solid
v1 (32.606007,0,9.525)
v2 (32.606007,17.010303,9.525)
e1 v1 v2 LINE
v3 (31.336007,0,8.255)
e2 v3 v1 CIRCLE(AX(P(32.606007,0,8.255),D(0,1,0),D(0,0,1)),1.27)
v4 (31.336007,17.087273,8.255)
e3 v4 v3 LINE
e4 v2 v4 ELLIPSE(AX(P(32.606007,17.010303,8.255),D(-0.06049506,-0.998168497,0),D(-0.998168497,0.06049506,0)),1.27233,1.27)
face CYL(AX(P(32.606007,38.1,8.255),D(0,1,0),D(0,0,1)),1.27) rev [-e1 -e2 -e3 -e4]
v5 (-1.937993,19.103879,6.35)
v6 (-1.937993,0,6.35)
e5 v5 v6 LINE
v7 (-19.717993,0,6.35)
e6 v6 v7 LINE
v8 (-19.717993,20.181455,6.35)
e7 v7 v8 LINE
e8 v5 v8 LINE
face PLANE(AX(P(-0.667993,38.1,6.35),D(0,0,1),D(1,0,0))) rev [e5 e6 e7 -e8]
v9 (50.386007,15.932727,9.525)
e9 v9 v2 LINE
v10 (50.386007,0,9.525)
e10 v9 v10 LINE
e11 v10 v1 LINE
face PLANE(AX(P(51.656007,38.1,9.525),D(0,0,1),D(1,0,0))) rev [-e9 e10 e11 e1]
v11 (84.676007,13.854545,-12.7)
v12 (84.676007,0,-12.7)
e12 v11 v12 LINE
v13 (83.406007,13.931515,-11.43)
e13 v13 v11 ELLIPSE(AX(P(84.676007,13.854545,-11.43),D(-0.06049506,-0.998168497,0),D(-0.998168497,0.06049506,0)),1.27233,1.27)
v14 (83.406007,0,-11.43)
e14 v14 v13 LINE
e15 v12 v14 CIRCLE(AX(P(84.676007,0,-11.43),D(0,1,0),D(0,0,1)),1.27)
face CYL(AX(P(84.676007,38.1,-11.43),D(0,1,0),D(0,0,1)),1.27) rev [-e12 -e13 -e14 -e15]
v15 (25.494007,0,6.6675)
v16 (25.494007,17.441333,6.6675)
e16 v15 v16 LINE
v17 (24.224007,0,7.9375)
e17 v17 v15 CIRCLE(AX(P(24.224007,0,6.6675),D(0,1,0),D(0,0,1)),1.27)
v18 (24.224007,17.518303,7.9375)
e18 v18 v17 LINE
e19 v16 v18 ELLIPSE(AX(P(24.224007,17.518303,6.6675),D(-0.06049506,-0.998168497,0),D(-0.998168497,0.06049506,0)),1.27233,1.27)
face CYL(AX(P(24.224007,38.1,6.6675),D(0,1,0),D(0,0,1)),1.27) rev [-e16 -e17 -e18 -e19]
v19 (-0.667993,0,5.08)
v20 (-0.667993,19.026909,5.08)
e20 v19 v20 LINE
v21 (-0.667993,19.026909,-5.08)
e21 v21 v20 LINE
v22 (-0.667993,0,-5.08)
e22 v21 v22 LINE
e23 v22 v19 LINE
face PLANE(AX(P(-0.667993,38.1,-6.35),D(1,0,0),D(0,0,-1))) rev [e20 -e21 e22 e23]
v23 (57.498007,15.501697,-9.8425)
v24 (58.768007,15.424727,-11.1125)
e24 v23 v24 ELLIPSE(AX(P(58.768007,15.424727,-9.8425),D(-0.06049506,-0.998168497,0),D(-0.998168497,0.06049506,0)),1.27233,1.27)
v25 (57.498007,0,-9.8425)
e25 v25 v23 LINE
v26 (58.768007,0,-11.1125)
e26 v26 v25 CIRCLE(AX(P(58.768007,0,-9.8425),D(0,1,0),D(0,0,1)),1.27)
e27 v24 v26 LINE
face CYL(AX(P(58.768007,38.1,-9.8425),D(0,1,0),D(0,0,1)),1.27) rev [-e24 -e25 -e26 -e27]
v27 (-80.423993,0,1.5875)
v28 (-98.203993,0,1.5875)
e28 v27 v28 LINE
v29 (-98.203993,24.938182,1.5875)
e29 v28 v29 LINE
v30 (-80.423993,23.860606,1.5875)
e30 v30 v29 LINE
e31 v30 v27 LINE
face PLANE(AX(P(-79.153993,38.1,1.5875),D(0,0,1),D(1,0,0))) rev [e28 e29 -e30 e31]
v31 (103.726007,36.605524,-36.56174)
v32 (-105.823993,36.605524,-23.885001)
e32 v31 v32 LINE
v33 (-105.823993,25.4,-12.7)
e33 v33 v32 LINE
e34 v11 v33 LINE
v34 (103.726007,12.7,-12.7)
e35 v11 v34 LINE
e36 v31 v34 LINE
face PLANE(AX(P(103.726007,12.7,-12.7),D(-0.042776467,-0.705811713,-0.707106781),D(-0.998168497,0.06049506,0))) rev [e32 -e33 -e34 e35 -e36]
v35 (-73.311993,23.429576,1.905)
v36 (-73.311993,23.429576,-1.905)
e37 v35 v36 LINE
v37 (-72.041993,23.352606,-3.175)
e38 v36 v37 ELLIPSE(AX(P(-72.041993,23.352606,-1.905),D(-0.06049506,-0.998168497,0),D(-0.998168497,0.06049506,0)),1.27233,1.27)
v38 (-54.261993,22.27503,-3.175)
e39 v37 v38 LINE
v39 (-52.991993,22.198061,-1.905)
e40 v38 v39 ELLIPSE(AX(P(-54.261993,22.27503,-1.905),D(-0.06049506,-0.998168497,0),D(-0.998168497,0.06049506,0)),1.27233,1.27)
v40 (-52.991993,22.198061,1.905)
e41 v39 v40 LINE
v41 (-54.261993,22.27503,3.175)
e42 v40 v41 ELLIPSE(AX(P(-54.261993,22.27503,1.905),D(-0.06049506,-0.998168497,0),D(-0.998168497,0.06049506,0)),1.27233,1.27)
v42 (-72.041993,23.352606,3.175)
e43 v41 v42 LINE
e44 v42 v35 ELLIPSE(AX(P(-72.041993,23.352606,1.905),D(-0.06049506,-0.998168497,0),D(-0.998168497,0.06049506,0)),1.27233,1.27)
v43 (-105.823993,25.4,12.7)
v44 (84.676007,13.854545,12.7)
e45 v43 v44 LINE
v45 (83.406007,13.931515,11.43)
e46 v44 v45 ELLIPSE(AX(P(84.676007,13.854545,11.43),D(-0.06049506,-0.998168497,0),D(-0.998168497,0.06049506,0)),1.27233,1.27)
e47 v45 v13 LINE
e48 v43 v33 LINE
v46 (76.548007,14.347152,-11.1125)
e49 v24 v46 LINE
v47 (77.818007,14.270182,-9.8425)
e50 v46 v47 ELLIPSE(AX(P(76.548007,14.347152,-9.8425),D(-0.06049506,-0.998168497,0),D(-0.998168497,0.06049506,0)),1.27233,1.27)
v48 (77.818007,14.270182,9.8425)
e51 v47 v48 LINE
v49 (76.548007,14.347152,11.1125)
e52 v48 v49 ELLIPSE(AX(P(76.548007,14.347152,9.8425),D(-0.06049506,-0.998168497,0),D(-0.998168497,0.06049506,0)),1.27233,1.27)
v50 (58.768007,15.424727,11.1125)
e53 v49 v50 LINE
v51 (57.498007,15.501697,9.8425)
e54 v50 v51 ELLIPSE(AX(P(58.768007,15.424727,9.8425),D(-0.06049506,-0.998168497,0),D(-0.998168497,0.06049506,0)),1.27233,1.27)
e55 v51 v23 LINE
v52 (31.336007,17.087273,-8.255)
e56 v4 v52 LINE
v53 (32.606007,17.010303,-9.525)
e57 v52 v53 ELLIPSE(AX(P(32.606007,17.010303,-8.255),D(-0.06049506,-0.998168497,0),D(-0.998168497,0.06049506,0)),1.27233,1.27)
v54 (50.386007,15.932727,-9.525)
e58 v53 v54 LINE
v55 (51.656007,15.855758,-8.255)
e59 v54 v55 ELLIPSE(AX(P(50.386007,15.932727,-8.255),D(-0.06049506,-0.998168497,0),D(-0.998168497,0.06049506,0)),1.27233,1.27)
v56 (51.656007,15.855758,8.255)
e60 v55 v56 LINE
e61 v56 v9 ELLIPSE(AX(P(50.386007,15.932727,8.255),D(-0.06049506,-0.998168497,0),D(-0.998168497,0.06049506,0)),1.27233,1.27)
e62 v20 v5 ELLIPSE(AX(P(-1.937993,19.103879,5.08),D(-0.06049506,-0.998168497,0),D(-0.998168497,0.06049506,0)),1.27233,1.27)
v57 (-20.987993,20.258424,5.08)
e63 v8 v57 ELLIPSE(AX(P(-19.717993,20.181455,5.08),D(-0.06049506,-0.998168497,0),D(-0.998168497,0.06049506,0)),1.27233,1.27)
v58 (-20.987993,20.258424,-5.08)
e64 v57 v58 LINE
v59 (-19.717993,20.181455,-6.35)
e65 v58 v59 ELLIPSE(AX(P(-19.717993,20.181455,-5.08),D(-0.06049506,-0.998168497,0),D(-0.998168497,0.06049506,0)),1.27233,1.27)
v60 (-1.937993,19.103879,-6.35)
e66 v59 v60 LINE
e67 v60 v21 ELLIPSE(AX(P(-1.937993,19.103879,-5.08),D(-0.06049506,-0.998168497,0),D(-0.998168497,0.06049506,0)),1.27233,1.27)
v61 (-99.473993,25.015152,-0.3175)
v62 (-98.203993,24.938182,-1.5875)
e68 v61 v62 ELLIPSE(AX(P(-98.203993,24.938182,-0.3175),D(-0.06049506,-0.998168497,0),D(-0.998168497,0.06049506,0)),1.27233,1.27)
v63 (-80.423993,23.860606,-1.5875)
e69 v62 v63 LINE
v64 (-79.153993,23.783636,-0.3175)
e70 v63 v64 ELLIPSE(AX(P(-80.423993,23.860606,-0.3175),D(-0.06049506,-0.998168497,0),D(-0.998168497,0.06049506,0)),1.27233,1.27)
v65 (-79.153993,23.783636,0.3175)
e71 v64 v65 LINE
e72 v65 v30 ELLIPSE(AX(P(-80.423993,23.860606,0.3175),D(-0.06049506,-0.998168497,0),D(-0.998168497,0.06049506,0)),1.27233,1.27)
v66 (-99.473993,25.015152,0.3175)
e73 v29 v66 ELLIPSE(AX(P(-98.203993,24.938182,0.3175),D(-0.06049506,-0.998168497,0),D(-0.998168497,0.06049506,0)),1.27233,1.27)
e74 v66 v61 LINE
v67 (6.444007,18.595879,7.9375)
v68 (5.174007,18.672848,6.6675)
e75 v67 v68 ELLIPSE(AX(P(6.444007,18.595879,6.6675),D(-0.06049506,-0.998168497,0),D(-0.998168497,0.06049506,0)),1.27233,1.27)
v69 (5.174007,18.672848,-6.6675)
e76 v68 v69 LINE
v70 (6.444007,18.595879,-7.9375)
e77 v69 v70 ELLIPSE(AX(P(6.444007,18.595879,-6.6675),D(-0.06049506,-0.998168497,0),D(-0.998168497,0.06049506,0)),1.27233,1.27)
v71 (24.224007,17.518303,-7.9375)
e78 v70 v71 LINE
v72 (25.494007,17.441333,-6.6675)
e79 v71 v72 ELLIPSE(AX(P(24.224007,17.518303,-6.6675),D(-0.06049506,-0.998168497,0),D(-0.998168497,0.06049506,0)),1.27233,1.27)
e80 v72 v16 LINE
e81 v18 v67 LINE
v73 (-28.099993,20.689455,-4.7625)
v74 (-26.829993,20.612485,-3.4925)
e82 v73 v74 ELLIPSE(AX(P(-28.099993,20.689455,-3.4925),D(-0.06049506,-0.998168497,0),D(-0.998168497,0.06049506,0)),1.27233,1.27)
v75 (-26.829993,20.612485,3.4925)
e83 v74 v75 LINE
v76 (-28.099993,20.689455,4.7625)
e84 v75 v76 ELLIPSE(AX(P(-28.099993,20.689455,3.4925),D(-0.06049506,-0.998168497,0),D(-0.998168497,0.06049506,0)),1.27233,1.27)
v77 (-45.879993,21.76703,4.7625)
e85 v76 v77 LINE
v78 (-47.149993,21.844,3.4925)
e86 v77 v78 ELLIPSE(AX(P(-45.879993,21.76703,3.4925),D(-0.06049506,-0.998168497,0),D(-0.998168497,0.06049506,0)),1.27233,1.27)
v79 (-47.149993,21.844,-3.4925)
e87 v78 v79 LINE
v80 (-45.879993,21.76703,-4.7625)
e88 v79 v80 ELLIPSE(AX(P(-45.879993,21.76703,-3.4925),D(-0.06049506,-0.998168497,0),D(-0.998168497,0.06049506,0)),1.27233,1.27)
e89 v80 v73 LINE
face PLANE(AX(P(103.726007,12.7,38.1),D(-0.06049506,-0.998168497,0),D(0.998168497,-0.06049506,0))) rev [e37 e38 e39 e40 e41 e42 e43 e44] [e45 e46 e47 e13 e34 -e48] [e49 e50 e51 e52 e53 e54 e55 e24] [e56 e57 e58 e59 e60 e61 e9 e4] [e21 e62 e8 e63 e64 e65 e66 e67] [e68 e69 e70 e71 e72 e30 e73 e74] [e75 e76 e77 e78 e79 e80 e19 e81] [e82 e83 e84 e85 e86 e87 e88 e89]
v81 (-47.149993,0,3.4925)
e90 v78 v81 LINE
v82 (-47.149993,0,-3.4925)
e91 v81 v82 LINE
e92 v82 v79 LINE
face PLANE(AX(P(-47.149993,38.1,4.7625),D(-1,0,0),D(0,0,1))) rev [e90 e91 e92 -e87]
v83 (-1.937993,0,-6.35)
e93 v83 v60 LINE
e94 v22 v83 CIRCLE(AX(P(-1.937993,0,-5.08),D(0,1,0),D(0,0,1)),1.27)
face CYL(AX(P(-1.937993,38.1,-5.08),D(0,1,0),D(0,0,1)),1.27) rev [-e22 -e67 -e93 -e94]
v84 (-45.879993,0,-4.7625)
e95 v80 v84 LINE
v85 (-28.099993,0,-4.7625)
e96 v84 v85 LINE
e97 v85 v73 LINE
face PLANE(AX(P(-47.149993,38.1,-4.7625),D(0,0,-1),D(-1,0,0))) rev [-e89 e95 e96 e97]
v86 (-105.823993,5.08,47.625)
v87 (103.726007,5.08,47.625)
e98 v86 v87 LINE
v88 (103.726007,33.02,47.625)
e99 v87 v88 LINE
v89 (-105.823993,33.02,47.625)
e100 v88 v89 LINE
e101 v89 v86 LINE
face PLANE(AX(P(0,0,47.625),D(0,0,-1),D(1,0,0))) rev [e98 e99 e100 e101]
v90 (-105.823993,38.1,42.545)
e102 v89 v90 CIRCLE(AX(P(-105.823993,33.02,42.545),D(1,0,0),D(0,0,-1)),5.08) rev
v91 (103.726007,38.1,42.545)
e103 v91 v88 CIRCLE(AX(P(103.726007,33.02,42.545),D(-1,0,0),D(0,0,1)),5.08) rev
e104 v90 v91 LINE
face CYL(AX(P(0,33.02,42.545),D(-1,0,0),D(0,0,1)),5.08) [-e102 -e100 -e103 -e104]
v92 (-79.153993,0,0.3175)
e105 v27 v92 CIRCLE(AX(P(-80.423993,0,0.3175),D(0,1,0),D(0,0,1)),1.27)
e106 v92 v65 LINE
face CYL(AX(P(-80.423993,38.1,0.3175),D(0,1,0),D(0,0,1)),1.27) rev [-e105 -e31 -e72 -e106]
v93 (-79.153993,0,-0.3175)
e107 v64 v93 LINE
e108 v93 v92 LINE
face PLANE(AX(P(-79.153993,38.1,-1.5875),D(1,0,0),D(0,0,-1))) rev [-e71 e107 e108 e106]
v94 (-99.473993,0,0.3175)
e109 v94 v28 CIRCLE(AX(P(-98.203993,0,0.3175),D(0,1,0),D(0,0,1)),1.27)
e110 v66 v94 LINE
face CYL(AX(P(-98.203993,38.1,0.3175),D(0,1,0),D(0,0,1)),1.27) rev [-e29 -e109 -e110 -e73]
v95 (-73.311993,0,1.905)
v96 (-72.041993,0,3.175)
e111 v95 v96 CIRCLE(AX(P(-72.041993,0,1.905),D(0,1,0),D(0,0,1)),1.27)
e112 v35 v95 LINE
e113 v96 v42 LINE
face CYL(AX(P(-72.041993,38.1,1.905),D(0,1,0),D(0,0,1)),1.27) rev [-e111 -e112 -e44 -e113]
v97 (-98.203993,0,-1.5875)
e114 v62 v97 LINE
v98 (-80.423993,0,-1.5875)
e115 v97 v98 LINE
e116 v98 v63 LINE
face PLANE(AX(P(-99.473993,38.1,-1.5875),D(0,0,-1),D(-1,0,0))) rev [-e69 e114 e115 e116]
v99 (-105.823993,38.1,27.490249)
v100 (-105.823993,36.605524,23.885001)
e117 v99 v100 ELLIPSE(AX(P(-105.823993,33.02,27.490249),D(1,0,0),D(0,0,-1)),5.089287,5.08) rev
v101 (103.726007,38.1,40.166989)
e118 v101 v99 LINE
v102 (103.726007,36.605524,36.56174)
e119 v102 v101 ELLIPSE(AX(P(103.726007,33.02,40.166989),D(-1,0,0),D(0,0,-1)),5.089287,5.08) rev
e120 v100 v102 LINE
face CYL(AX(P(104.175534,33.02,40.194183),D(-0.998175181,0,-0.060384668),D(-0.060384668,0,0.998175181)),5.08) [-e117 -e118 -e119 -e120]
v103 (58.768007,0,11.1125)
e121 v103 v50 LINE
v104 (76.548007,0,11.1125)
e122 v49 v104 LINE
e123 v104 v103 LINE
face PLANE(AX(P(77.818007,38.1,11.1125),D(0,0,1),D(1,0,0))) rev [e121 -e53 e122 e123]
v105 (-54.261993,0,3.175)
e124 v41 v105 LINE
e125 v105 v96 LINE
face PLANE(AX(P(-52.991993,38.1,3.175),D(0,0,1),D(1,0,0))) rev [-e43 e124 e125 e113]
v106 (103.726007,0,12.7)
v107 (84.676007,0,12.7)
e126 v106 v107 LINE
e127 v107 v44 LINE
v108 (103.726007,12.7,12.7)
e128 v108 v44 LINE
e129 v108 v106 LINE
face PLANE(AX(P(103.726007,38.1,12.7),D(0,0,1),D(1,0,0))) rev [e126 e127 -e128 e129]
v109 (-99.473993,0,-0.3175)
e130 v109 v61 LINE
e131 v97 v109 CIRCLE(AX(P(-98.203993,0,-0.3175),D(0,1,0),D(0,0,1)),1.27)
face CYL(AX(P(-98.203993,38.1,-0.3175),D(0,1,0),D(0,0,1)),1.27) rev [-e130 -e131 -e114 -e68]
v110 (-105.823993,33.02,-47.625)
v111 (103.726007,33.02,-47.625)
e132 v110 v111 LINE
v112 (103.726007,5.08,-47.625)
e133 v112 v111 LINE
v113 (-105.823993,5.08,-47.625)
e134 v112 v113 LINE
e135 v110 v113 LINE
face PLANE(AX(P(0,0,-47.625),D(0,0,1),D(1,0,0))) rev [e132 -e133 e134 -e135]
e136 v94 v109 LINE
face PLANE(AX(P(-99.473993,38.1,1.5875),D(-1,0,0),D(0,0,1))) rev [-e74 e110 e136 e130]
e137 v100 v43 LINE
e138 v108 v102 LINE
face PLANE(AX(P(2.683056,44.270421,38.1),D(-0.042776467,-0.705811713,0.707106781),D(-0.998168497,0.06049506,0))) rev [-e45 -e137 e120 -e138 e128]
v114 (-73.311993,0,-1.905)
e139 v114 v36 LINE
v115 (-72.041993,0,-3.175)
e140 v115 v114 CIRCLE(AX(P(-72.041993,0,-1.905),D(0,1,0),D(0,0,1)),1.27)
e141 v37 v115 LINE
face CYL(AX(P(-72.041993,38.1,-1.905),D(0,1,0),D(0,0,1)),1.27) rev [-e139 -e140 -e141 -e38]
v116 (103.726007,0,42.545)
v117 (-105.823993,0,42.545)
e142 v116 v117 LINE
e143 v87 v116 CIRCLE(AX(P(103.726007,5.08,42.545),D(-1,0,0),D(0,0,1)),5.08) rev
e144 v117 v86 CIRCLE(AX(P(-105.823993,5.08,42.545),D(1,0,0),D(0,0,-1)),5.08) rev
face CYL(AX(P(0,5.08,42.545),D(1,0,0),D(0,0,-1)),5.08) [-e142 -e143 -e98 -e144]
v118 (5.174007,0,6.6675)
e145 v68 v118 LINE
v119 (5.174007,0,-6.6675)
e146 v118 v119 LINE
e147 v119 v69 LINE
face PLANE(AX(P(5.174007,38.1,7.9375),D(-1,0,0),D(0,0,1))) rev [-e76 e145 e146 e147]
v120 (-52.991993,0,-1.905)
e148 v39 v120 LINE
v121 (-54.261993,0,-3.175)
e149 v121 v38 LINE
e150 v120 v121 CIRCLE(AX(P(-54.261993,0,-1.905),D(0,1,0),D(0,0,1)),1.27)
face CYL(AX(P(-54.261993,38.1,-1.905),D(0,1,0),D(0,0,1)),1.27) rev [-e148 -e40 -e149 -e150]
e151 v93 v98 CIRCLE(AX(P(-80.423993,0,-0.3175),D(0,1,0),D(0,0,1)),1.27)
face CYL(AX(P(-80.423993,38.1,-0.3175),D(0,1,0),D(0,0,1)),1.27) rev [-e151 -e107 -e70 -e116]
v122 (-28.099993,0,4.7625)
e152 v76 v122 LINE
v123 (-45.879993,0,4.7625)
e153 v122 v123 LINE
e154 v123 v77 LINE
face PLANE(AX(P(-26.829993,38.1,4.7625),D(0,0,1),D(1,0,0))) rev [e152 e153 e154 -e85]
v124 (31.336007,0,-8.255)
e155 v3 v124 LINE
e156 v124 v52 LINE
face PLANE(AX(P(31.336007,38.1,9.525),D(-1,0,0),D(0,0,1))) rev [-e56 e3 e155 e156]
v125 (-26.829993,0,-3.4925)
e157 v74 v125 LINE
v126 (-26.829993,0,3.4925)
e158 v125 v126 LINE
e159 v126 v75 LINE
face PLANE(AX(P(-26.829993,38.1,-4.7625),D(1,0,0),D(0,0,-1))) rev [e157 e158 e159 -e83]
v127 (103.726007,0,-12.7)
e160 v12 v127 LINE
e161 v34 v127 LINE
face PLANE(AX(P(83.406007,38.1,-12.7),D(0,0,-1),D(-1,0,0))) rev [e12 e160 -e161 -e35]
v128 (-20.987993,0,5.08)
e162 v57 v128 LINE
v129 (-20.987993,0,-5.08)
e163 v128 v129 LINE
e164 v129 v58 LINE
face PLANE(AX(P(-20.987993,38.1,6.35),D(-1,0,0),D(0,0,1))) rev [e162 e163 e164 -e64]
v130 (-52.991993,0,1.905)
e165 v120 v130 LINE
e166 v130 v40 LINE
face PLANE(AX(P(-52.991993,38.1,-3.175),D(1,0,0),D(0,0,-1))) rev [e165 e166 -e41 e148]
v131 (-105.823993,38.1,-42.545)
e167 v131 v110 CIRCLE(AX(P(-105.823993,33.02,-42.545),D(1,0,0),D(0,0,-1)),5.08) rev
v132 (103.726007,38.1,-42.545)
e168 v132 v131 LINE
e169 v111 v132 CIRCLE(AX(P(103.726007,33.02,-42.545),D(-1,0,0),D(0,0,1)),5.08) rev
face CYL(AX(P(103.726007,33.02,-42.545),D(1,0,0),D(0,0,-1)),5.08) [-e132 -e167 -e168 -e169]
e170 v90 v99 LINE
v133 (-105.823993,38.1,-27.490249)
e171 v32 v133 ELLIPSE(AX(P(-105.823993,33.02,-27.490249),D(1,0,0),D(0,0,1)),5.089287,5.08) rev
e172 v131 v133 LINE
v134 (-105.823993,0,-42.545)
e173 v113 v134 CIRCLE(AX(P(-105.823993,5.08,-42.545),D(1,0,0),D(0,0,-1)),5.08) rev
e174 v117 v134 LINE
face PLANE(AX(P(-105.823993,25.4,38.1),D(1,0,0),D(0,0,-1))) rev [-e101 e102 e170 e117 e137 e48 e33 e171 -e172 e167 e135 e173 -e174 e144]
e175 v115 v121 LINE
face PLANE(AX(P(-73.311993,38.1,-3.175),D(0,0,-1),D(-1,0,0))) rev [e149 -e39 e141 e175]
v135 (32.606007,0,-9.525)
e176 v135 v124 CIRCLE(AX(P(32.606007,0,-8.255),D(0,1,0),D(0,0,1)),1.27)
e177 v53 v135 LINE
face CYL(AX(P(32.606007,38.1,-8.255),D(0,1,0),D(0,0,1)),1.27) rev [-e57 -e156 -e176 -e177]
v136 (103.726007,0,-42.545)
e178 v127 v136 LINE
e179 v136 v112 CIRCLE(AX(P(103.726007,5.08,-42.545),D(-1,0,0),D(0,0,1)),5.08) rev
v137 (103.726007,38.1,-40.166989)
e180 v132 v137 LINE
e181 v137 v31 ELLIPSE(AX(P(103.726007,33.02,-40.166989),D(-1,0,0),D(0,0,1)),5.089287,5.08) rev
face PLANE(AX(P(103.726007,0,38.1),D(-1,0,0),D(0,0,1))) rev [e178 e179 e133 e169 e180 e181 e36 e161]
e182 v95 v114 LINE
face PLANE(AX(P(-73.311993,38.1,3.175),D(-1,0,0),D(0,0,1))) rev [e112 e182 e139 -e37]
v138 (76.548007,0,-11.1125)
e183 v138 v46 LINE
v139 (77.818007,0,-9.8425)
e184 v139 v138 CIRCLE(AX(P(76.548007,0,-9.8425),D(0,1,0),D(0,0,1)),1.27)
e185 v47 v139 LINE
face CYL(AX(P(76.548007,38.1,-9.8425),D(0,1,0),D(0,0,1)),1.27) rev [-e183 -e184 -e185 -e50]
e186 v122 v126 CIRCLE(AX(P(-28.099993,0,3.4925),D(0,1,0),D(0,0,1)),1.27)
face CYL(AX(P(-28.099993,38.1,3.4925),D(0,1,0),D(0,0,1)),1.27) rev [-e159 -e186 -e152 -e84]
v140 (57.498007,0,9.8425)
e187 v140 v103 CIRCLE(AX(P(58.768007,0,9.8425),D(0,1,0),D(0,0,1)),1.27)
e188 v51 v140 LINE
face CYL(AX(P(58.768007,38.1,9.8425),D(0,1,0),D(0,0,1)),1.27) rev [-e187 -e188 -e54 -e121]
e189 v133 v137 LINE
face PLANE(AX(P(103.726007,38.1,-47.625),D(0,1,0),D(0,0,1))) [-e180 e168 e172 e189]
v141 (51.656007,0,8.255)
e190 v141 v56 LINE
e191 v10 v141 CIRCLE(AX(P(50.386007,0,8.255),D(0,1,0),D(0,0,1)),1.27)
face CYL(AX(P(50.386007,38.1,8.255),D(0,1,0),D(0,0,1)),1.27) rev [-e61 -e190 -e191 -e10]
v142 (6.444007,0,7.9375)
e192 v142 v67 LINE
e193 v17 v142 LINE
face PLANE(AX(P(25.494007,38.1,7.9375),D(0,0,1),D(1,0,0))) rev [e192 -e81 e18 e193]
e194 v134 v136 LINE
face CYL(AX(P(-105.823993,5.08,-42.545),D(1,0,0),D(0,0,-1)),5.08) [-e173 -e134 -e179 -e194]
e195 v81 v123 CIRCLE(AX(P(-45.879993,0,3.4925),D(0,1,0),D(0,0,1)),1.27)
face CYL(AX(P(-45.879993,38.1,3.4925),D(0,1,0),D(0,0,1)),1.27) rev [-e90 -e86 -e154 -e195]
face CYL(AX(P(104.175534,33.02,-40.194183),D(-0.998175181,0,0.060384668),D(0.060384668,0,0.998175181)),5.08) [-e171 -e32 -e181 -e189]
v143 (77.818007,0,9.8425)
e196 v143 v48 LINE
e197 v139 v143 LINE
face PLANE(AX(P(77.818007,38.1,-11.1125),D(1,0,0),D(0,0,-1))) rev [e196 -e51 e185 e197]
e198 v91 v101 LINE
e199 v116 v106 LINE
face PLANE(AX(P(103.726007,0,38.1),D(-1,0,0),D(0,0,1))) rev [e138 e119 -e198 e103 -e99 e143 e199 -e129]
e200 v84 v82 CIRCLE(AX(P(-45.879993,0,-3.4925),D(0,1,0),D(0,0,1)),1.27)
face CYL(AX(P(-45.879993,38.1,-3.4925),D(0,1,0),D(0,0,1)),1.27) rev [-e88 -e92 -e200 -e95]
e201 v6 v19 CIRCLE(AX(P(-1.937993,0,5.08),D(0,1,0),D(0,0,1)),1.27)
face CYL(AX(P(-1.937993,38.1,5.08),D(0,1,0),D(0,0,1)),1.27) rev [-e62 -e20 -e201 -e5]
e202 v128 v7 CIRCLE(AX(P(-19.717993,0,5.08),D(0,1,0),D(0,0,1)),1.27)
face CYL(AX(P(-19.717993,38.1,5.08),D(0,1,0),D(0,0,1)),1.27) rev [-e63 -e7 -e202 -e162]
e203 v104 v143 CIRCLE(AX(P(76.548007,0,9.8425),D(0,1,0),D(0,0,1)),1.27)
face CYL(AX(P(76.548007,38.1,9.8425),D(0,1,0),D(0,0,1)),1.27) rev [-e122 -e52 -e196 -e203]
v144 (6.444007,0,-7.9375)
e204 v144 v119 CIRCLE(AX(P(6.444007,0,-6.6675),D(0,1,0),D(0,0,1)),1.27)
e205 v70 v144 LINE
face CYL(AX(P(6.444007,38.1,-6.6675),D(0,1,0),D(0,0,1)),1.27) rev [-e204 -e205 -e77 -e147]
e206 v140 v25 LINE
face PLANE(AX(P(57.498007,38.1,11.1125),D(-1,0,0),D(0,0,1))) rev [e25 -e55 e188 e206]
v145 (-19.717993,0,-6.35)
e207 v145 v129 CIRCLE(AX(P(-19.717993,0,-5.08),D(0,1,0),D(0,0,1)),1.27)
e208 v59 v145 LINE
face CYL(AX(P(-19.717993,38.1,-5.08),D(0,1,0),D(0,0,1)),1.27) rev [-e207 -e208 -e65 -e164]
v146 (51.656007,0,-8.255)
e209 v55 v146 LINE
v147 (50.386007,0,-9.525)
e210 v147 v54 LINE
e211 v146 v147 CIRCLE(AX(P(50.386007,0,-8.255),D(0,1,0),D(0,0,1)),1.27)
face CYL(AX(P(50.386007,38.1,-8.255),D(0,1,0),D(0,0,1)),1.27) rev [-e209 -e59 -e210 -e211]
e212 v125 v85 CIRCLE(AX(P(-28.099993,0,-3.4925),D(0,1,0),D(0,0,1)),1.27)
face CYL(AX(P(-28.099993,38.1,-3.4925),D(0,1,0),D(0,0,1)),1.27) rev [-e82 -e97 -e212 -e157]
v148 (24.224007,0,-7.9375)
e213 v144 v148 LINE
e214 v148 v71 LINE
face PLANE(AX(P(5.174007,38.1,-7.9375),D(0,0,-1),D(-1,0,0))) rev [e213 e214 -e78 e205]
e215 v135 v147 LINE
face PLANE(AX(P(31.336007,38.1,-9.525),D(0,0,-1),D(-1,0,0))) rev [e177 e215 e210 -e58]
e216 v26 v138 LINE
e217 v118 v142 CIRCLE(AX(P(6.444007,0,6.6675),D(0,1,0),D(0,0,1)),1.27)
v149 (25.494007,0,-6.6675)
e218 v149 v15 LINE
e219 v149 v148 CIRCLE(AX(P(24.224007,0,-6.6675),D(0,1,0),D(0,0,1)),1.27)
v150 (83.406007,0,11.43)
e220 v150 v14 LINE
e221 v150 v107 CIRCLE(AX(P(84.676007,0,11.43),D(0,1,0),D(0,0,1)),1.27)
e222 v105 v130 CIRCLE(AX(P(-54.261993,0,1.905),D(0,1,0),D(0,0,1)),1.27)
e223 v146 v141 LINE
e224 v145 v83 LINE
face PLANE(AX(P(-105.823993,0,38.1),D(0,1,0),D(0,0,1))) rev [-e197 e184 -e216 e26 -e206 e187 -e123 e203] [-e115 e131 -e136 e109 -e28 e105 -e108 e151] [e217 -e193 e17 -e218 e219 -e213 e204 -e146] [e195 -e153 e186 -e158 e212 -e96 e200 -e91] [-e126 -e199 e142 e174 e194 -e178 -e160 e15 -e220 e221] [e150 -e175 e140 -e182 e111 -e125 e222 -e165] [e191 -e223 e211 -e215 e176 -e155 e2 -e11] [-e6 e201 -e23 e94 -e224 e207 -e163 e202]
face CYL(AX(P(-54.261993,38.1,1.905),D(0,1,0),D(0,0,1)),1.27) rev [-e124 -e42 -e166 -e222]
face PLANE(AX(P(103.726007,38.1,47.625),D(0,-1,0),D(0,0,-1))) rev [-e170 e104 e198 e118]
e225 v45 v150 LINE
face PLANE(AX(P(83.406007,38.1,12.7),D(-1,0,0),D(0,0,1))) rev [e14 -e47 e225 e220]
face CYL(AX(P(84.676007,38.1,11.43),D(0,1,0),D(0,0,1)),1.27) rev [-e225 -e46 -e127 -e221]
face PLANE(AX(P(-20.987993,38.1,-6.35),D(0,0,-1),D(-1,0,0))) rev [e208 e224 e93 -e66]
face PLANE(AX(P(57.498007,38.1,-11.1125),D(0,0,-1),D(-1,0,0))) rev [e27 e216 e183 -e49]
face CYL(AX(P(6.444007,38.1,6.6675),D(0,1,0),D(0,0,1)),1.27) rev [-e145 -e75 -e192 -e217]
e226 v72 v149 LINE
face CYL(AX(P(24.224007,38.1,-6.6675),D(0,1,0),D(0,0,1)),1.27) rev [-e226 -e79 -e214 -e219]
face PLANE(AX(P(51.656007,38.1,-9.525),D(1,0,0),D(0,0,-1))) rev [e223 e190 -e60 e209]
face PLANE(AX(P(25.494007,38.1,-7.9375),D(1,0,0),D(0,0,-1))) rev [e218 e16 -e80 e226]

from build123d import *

# Parameters (mm, degrees)
BOSS_EXTRUDE1_DEPTH = 38.1
SKETCH2_W           = 209.55
SKETCH2_H           = 38.1
BOSS_EXTRUDE2_DEPTH = 9.525
SKETCH3_W           = 20.32
SKETCH3_H           = 3.175
SKETCH3_H_2         = 6.35
SKETCH3_H_3         = 9.525
SKETCH3_H_4         = 12.7
SKETCH3_H_5         = 15.875
SKETCH3_H_6         = 19.05
SKETCH3_H_7         = 22.225
SKETCH3_H_8         = 25.4
CUT_EXTRUDE1_DEPTH  = 123.141181515
CHAMFER1_SIZE       = 25.4
CHAMFER2_SIZE       = 25.4
FILLET1_R           = 1.27
FILLET2_R           = 5.08


with BuildPart() as part:
    # Sketch1 → Boss-Extrude1 (new, symmetric)
    with BuildSketch(Plane.XY):
        Polygon((-105.823993484, 0), (103.726006516, 0), (103.726006516, 12.7), (-105.823993484, 25.4), align=None)
    extrude(amount=BOSS_EXTRUDE1_DEPTH, both=True)

    # Sketch2 → Boss-Extrude2 (add)
    with BuildSketch(Plane(origin=(0, 0, -38.1), x_dir=(-1, 0, 0), z_dir=(0, 0, -1))):
        with Locations((1.048993484, 19.05)):
            Rectangle(SKETCH2_W, SKETCH2_H)
    boss_extrude2 = extrude(amount=BOSS_EXTRUDE2_DEPTH)

    # Mirror1: Boss-Extrude2 across plane
    add(boss_extrude2.mirror(Plane.XY))

    # Sketch3 → Cut-Extrude1 (cut, through all)
    with BuildSketch(Plane.XZ):
        with Locations((-89.313993484, 0)):
            Rectangle(SKETCH3_W, SKETCH3_H)
        with Locations((-63.151993484, 0)):
            Rectangle(SKETCH3_W, SKETCH3_H_2)
        with Locations((-36.989993484, 0)):
            Rectangle(SKETCH3_W, SKETCH3_H_3)
        with Locations((-10.827993484, 0)):
            Rectangle(SKETCH3_W, SKETCH3_H_4)
        with Locations((15.334006516, 0)):
            Rectangle(SKETCH3_W, SKETCH3_H_5)
        with Locations((41.496006516, 0)):
            Rectangle(SKETCH3_W, SKETCH3_H_6)
        with Locations((67.658006516, 0)):
            Rectangle(SKETCH3_W, SKETCH3_H_7)
        with Locations((93.566006516, 0)):
            Rectangle(SKETCH3_W, SKETCH3_H_8)
    extrude(amount=-CUT_EXTRUDE1_DEPTH, mode=Mode.SUBTRACT)

    # Chamfer1
    # the kernel refuses this chamfer: 25.4 mm, written as the material it adds along each edge
    with BuildSketch(Plane(origin=(168.92711924, 8.748417411, 38.1), x_dir=(0.060472188242602316, 0.9977911060029382, 0.02749587661058647), z_dir=(-0.9981684966311909, 0.06049506040189036, 0))) as chamfer1_piece_1_section:
        Polygon((CHAMFER1_SIZE * 0.999621916911, CHAMFER1_SIZE * 0.0274958766106), (-CHAMFER1_SIZE * 0.0274958766106, CHAMFER1_SIZE * 0.999621916911), (0, 0), align=None)
    chamfer1_piece_1 = extrude(amount=340.575991525, mode=Mode.PRIVATE)
    chamfer1_piece_1 = split(chamfer1_piece_1, bisect_by=Plane(origin=(103.726006516, 21.644739683, 29.711789503), z_dir=(-1, 0, 0)), keep=Keep.TOP, mode=Mode.PRIVATE)
    chamfer1_piece_1 = split(chamfer1_piece_1, bisect_by=Plane(origin=(93.576497018, 21.644739683, 12.7), z_dir=(0, 0, 1)), keep=Keep.TOP, mode=Mode.PRIVATE)
    chamfer1_piece_1 = split(chamfer1_piece_1, bisect_by=Plane(origin=(83.406006516, 21.644739683, 29.711789503), z_dir=(1, 0, 0)), keep=Keep.TOP, mode=Mode.PRIVATE)
    chamfer1_piece_1 = split(chamfer1_piece_1, bisect_by=Plane(origin=(93.576497018, 38.1, 29.711789503), z_dir=(0, -1, 0)), keep=Keep.TOP, mode=Mode.PRIVATE)
    add(chamfer1_piece_1)
    with BuildSketch(Plane(origin=(168.92711924, 8.748417411, 38.1), x_dir=(0.060472188242602316, 0.9977911060029382, 0.02749587661058647), z_dir=(-0.9981684966311909, 0.06049506040189036, 0))) as chamfer1_piece_2_section:
        Polygon((CHAMFER1_SIZE * 0.999621916911, CHAMFER1_SIZE * 0.0274958766106), (-CHAMFER1_SIZE * 0.0274958766106, CHAMFER1_SIZE * 0.999621916911), (0, 0), align=None)
    chamfer1_piece_2 = extrude(amount=340.575991525, mode=Mode.PRIVATE)
    chamfer1_piece_2 = split(chamfer1_piece_2, bisect_by=Plane(origin=(-105.823993484, 26.508792165, 29.076634432), z_dir=(1, 0, 0)), keep=Keep.TOP, mode=Mode.PRIVATE)
    chamfer1_piece_2 = split(chamfer1_piece_2, bisect_by=Plane(origin=(-6.816832876, 26.508792165, 12.7), z_dir=(0, 0, 1)), keep=Keep.TOP, mode=Mode.PRIVATE)
    chamfer1_piece_2 = split(chamfer1_piece_2, bisect_by=Plane(origin=(83.406006516, 26.508792165, 29.076634432), z_dir=(-1, 0, 0)), keep=Keep.TOP, mode=Mode.PRIVATE)
    chamfer1_piece_2 = split(chamfer1_piece_2, bisect_by=Plane(origin=(-6.816832876, 38.1, 29.076634432), z_dir=(0, -1, 0)), keep=Keep.TOP, mode=Mode.PRIVATE)
    add(chamfer1_piece_2)

    # Chamfer2
    # the kernel refuses this chamfer: 25.4 mm, written as the material it adds along each edge
    with BuildSketch(Plane(origin=(168.92711924, 8.748417411, -38.1), x_dir=(0.060472188242602316, 0.9977911060029382, -0.02749587661058647), z_dir=(-0.9981684966311909, 0.06049506040189036, 0))) as chamfer2_piece_1_section:
        Polygon((CHAMFER2_SIZE * 0.999621916911, -CHAMFER2_SIZE * 0.0274958766106), (-CHAMFER2_SIZE * 0.0274958766106, -CHAMFER2_SIZE * 0.999621916911), (0, 0), align=None)
    chamfer2_piece_1 = extrude(amount=340.575991525, mode=Mode.PRIVATE)
    chamfer2_piece_1 = split(chamfer2_piece_1, bisect_by=Plane(origin=(93.576497018, 38.1, -29.711789503), z_dir=(0, -1, 0)), keep=Keep.TOP, mode=Mode.PRIVATE)
    chamfer2_piece_1 = split(chamfer2_piece_1, bisect_by=Plane(origin=(103.726006516, 21.644739683, -29.711789503), z_dir=(-1, 0, 0)), keep=Keep.TOP, mode=Mode.PRIVATE)
    chamfer2_piece_1 = split(chamfer2_piece_1, bisect_by=Plane(origin=(93.576497018, 21.644739683, -12.7), z_dir=(0, 0, -1)), keep=Keep.TOP, mode=Mode.PRIVATE)
    chamfer2_piece_1 = split(chamfer2_piece_1, bisect_by=Plane(origin=(83.406006516, 21.644739683, -29.711789503), z_dir=(1, 0, 0)), keep=Keep.TOP, mode=Mode.PRIVATE)
    add(chamfer2_piece_1)
    with BuildSketch(Plane(origin=(168.92711924, 8.748417411, -38.1), x_dir=(0.060472188242602316, 0.9977911060029382, -0.02749587661058647), z_dir=(-0.9981684966311909, 0.06049506040189036, 0))) as chamfer2_piece_2_section:
        Polygon((CHAMFER2_SIZE * 0.999621916911, -CHAMFER2_SIZE * 0.0274958766106), (-CHAMFER2_SIZE * 0.0274958766106, -CHAMFER2_SIZE * 0.999621916911), (0, 0), align=None)
    chamfer2_piece_2 = extrude(amount=340.575991525, mode=Mode.PRIVATE)
    chamfer2_piece_2 = split(chamfer2_piece_2, bisect_by=Plane(origin=(-105.823993484, 26.508792165, -29.076634432), z_dir=(1, 0, 0)), keep=Keep.TOP, mode=Mode.PRIVATE)
    chamfer2_piece_2 = split(chamfer2_piece_2, bisect_by=Plane(origin=(-6.816832876, 38.1, -29.076634432), z_dir=(0, -1, 0)), keep=Keep.TOP, mode=Mode.PRIVATE)
    chamfer2_piece_2 = split(chamfer2_piece_2, bisect_by=Plane(origin=(-6.816832876, 26.508792165, -12.7), z_dir=(0, 0, -1)), keep=Keep.TOP, mode=Mode.PRIVATE)
    chamfer2_piece_2 = split(chamfer2_piece_2, bisect_by=Plane(origin=(83.406006516, 26.508792165, -29.076634432), z_dir=(-1, 0, 0)), keep=Keep.TOP, mode=Mode.PRIVATE)
    add(chamfer2_piece_2)

    # Fillet1
    fillet1_edges = [part.edges().sort_by_distance(p)[0] for p in [
        (-20.987993484, 10.129212121, -6.35),
        (-20.987993484, 10.129212121, 6.35),
        (-0.667993484, 9.513454545, 6.35),
        (-0.667993484, 9.513454545, -6.35),
        (5.174006516, 9.336424242, -7.9375),
        (5.174006516, 9.336424242, 7.9375),
        (25.494006516, 8.720666667, 7.9375),
        (25.494006516, 8.720666667, -7.9375),
        (31.336006516, 8.543636364, -9.525),
        (31.336006516, 8.543636364, 9.525),
        (51.656006516, 7.927878788, 9.525),
        (51.656006516, 7.927878788, -9.525),
        (57.498006516, 7.750848485, -11.1125),
        (57.498006516, 7.750848485, 11.1125),
        (77.818006516, 7.135090909, 11.1125),
        (77.818006516, 7.135090909, -11.1125),
        (83.406006516, 6.965757576, -12.7),
        (83.406006516, 6.965757576, 12.7),
        (-99.473993484, 12.507575758, 1.5875),
        (-79.153993484, 11.891818182, 1.5875),
        (-79.153993484, 11.891818182, -1.5875),
        (-99.473993484, 12.507575758, -1.5875),
        (-73.311993484, 11.714787879, -3.175),
        (-73.311993484, 11.714787879, 3.175),
        (-52.991993484, 11.099030303, 3.175),
        (-52.991993484, 11.099030303, -3.175),
        (-47.149993484, 10.922, -4.7625),
        (-47.149993484, 10.922, 4.7625),
        (-26.829993484, 10.306242424, 4.7625),
        (-26.829993484, 10.306242424, -4.7625),
    ]]
    fillet(fillet1_edges, radius=FILLET1_R)

    # Fillet2
    fillet2_edges = [part.edges().sort_by_distance(p)[0] for p in [
        (-1.048993484, 0, -47.625),
        (-1.048993484, 38.1, -47.625),
        (-1.048993484, 38.1, 31.715109861),
        (-1.048993484, 38.1, -31.715109861),
        (-1.048993484, 38.1, 47.625),
        (-1.048993484, 0, 47.625),
    ]]
    fillet(fillet2_edges, radius=FILLET2_R)


solid = part.part
